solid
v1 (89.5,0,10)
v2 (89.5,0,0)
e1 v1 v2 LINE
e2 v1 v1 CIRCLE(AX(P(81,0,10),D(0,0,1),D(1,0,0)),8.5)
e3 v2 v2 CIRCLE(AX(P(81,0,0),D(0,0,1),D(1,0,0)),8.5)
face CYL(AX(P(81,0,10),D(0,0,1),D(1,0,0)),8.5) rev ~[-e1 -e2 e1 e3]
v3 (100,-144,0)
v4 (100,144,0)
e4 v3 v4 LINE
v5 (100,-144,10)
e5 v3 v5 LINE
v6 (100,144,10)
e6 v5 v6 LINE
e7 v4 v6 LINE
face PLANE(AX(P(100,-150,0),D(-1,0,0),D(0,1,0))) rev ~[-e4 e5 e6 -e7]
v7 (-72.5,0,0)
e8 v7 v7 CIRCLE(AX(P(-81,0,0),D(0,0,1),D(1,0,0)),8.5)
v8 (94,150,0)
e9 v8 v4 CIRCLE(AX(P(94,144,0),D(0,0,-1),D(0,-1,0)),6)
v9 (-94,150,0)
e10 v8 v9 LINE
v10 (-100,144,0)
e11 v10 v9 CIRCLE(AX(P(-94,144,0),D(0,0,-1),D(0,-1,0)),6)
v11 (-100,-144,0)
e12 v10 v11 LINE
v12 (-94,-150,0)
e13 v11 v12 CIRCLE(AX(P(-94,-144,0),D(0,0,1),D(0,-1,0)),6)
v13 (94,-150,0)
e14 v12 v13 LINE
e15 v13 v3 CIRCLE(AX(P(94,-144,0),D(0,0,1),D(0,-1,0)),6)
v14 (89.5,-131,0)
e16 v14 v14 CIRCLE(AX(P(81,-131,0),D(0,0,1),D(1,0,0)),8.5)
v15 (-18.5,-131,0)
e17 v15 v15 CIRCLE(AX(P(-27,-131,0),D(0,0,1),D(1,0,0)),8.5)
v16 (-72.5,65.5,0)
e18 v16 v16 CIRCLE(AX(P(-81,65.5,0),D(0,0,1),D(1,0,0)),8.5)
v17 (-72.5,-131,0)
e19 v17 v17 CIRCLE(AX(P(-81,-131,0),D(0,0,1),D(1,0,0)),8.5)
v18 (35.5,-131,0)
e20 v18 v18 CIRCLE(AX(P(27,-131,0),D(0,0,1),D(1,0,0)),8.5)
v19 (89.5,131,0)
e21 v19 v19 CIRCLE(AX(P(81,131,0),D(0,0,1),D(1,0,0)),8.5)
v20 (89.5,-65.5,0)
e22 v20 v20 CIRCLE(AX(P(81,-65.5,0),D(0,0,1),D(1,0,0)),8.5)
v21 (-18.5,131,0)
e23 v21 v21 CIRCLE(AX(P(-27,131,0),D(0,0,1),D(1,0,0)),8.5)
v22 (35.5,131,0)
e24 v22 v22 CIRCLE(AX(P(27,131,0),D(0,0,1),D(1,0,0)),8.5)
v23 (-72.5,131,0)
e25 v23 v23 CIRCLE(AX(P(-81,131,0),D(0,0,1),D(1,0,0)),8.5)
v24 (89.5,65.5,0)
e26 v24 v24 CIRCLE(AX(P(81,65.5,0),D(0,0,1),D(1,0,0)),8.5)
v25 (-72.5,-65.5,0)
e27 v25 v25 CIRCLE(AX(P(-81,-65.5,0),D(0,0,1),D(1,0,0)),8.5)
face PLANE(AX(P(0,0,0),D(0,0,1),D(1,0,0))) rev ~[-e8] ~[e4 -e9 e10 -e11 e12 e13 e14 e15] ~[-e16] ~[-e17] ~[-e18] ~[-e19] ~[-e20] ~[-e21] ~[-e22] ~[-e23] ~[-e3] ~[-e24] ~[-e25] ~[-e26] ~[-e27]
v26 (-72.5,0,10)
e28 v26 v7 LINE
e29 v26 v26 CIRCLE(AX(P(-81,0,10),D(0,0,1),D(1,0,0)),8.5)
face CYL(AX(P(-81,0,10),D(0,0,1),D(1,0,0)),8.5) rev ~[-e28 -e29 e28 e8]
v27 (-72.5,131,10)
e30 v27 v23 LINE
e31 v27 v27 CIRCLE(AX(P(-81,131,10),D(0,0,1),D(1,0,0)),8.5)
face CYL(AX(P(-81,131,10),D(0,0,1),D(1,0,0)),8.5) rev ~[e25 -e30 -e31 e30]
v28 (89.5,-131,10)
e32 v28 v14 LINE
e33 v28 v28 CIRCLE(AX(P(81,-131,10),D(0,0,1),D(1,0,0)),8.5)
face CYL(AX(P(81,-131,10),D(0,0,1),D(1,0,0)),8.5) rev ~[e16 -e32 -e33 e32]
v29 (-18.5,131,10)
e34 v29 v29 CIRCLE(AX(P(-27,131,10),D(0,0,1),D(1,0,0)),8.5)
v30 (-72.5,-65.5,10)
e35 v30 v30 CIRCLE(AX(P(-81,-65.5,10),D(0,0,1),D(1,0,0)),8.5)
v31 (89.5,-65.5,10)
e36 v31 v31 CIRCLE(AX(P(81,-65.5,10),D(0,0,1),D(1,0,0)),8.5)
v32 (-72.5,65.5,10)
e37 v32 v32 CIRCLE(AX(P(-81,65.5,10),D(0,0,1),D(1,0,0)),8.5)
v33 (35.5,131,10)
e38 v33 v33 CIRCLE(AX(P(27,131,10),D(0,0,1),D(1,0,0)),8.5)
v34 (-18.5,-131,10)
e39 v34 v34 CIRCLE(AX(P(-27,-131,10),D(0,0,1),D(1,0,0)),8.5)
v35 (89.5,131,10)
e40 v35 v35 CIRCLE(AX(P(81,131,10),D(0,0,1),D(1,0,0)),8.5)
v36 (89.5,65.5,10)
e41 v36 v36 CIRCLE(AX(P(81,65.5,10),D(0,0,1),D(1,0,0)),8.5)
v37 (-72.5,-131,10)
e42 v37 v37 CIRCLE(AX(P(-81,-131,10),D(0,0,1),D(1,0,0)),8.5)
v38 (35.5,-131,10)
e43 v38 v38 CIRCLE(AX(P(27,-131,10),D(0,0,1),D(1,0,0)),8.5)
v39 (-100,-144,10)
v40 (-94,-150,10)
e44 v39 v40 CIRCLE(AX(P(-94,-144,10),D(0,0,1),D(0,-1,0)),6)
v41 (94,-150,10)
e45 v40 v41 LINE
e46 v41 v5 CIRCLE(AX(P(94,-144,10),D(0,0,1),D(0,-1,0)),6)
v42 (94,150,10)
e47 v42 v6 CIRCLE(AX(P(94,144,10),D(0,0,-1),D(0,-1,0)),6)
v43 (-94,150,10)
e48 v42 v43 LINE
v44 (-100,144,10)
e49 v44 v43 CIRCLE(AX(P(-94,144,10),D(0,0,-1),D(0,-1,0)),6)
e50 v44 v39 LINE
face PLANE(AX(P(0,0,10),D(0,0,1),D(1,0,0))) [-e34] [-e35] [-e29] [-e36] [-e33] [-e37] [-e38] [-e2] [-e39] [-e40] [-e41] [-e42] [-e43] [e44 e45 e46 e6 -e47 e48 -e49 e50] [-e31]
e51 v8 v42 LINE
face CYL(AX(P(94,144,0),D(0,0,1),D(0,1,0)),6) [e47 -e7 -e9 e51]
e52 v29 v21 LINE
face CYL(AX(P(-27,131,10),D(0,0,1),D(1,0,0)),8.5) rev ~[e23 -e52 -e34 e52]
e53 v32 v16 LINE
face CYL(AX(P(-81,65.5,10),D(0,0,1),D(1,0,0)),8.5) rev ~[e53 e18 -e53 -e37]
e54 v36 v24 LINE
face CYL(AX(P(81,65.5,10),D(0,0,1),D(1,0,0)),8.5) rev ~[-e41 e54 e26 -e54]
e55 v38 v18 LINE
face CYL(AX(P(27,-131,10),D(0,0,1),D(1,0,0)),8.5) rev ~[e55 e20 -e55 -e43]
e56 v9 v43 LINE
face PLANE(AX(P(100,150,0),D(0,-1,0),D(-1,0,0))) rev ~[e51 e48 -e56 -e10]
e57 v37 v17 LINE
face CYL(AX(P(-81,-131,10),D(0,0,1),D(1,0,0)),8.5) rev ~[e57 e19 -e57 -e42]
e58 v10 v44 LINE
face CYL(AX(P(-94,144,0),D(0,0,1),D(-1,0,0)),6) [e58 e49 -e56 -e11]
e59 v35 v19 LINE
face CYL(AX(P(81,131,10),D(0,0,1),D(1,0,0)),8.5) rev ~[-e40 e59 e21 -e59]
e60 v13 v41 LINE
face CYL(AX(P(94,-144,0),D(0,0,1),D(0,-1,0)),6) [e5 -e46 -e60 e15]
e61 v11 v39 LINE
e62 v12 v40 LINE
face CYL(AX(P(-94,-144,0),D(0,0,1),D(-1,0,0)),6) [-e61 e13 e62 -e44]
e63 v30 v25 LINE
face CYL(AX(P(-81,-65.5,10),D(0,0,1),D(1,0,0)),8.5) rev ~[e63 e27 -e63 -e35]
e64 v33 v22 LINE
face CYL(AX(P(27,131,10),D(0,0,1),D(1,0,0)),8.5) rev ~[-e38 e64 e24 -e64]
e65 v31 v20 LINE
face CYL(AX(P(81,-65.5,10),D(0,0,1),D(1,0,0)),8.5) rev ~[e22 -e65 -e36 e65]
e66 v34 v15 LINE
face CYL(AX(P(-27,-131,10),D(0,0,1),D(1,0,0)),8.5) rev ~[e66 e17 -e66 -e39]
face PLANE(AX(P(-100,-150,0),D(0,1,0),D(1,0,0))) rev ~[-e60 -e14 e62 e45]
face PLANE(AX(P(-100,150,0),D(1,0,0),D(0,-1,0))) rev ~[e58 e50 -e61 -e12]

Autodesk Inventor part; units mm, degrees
ref_plane "YZ Plane" through (0, 0, 0) normal (1, 0, 0) x (0, 1, 0)
ref_plane "XZ Plane" through (0, 0, 0) normal (0, 1, 0) x (-1, 0, 0)
ref_plane "XY Plane" through (0, 0, 0) normal (0, 0, 1) x (1, 0, 0)
sketch "Sketch2" plane through (0, 0, 0) normal (0, 0, 1) x (1, 0, 0)
  line L0 (-50, -100) -> (50, -100)
  line L1 (50, -100) -> (50, 100)
  line L2 (50, 100) -> (-50, 100)
  line L3 (-50, 100) -> (-50, -100)
  line L4 (-50, -100) -> (50, 100) construction
  line L5 (50, -100) -> (-50, 100) construction
  line L6 (-100, -150) -> (100, -150)
  line L7 (100, -150) -> (100, 150)
  line L8 (100, 150) -> (-100, 150)
  line L9 (-100, 150) -> (-100, -150)
  point P0 (0, 0)
  dimension "d29" = 100
  dimension "d30" = 200
  dimension "d31" = 50
extrude "Plate2" add sketch "Sketch2" along normal blind 10 contours L3 L2 L1 L0 | L9 L8 L7 L6
sketch "Sketch5" plane through (0, 0, 10) normal (0, 0, 1) x (1, 0, 0)
  line L0 (100, -150) -> (-100, -150) construction
  line L1 (100, 150) -> (100, -150) construction
  line L2 (-100, 150) -> (100, 150) construction
  line L3 (-100, -150) -> (-100, 150) construction
  line L4 (-81, 131) -> (81, 131) construction
  line L5 (81, 131) -> (81, -131) construction
  line L6 (81, -131) -> (-81, -131) construction
  line L7 (-81, -131) -> (-81, 131) construction
  circle A0 centre (-81, -131) radius 8.5
  circle A1 centre (-81, 131) radius 8.5
  circle A2 centre (-81, 0) radius 8.5
  circle A3 centre (-81, -65.5) radius 8.5
  circle A4 centre (-81, 65.5) radius 8.5
  line L8 (-50, 0) -> (50, 0) construction
  circle A5 centre (-27, -131) radius 8.5
  circle A6 centre (-27, -65.5) radius 8.5
  circle A7 centre (-27, 0) radius 8.5
  circle A8 centre (-27, 65.5) radius 8.5
  circle A9 centre (-27, 131) radius 8.5
  circle A10 centre (27, -131) radius 8.5
  circle A11 centre (27, -65.5) radius 8.5
  circle A12 centre (27, 0) radius 8.5
  circle A13 centre (27, 65.5) radius 8.5
  circle A14 centre (27, 131) radius 8.5
  circle A15 centre (81, -131) radius 8.5
  circle A16 centre (81, -65.5) radius 8.5
  circle A17 centre (81, 0) radius 8.5
  circle A18 centre (81, 65.5) radius 8.5
  circle A19 centre (81, 131) radius 8.5
  point P0 (0, 0)
  point P1 (0, -131)
  dimension "d33" = 17
  dimension "d34" = 19
  dimension "d35" = 65.5
  dimension "d36" = 65.5
  dimension "d39" = 54
extrude "Cut3" cut sketch "Sketch5" against normal blind 10 contours A0 | A1 | A2 | A3 | A4 | A5 | A9 | A10 | A14 | A15 | A16 | A17 | A18 | A19
fillet "Corner Round1" radius 6 4 edges at (-100, -150, 5) (-100, 150, 5) (100, 150, 5) (100, -150, 5)
equation "\"d35\" = d36"
equation "\"d44\" = Thickness"
equation "\"d14\" = Thickness"
equation "\"BendReliefDepth\" = 0.5 * Thickness"
equation "\"TransitionRadius\" = BendRadius"
equation "\"JacobiRadiusSize\" = BendRadius"
equation "\"Thickness\" = 10"
equation "\"BendRadius\" = 6"
properties part number "PRS 1607 charging flange rect_940" material "Steel"
